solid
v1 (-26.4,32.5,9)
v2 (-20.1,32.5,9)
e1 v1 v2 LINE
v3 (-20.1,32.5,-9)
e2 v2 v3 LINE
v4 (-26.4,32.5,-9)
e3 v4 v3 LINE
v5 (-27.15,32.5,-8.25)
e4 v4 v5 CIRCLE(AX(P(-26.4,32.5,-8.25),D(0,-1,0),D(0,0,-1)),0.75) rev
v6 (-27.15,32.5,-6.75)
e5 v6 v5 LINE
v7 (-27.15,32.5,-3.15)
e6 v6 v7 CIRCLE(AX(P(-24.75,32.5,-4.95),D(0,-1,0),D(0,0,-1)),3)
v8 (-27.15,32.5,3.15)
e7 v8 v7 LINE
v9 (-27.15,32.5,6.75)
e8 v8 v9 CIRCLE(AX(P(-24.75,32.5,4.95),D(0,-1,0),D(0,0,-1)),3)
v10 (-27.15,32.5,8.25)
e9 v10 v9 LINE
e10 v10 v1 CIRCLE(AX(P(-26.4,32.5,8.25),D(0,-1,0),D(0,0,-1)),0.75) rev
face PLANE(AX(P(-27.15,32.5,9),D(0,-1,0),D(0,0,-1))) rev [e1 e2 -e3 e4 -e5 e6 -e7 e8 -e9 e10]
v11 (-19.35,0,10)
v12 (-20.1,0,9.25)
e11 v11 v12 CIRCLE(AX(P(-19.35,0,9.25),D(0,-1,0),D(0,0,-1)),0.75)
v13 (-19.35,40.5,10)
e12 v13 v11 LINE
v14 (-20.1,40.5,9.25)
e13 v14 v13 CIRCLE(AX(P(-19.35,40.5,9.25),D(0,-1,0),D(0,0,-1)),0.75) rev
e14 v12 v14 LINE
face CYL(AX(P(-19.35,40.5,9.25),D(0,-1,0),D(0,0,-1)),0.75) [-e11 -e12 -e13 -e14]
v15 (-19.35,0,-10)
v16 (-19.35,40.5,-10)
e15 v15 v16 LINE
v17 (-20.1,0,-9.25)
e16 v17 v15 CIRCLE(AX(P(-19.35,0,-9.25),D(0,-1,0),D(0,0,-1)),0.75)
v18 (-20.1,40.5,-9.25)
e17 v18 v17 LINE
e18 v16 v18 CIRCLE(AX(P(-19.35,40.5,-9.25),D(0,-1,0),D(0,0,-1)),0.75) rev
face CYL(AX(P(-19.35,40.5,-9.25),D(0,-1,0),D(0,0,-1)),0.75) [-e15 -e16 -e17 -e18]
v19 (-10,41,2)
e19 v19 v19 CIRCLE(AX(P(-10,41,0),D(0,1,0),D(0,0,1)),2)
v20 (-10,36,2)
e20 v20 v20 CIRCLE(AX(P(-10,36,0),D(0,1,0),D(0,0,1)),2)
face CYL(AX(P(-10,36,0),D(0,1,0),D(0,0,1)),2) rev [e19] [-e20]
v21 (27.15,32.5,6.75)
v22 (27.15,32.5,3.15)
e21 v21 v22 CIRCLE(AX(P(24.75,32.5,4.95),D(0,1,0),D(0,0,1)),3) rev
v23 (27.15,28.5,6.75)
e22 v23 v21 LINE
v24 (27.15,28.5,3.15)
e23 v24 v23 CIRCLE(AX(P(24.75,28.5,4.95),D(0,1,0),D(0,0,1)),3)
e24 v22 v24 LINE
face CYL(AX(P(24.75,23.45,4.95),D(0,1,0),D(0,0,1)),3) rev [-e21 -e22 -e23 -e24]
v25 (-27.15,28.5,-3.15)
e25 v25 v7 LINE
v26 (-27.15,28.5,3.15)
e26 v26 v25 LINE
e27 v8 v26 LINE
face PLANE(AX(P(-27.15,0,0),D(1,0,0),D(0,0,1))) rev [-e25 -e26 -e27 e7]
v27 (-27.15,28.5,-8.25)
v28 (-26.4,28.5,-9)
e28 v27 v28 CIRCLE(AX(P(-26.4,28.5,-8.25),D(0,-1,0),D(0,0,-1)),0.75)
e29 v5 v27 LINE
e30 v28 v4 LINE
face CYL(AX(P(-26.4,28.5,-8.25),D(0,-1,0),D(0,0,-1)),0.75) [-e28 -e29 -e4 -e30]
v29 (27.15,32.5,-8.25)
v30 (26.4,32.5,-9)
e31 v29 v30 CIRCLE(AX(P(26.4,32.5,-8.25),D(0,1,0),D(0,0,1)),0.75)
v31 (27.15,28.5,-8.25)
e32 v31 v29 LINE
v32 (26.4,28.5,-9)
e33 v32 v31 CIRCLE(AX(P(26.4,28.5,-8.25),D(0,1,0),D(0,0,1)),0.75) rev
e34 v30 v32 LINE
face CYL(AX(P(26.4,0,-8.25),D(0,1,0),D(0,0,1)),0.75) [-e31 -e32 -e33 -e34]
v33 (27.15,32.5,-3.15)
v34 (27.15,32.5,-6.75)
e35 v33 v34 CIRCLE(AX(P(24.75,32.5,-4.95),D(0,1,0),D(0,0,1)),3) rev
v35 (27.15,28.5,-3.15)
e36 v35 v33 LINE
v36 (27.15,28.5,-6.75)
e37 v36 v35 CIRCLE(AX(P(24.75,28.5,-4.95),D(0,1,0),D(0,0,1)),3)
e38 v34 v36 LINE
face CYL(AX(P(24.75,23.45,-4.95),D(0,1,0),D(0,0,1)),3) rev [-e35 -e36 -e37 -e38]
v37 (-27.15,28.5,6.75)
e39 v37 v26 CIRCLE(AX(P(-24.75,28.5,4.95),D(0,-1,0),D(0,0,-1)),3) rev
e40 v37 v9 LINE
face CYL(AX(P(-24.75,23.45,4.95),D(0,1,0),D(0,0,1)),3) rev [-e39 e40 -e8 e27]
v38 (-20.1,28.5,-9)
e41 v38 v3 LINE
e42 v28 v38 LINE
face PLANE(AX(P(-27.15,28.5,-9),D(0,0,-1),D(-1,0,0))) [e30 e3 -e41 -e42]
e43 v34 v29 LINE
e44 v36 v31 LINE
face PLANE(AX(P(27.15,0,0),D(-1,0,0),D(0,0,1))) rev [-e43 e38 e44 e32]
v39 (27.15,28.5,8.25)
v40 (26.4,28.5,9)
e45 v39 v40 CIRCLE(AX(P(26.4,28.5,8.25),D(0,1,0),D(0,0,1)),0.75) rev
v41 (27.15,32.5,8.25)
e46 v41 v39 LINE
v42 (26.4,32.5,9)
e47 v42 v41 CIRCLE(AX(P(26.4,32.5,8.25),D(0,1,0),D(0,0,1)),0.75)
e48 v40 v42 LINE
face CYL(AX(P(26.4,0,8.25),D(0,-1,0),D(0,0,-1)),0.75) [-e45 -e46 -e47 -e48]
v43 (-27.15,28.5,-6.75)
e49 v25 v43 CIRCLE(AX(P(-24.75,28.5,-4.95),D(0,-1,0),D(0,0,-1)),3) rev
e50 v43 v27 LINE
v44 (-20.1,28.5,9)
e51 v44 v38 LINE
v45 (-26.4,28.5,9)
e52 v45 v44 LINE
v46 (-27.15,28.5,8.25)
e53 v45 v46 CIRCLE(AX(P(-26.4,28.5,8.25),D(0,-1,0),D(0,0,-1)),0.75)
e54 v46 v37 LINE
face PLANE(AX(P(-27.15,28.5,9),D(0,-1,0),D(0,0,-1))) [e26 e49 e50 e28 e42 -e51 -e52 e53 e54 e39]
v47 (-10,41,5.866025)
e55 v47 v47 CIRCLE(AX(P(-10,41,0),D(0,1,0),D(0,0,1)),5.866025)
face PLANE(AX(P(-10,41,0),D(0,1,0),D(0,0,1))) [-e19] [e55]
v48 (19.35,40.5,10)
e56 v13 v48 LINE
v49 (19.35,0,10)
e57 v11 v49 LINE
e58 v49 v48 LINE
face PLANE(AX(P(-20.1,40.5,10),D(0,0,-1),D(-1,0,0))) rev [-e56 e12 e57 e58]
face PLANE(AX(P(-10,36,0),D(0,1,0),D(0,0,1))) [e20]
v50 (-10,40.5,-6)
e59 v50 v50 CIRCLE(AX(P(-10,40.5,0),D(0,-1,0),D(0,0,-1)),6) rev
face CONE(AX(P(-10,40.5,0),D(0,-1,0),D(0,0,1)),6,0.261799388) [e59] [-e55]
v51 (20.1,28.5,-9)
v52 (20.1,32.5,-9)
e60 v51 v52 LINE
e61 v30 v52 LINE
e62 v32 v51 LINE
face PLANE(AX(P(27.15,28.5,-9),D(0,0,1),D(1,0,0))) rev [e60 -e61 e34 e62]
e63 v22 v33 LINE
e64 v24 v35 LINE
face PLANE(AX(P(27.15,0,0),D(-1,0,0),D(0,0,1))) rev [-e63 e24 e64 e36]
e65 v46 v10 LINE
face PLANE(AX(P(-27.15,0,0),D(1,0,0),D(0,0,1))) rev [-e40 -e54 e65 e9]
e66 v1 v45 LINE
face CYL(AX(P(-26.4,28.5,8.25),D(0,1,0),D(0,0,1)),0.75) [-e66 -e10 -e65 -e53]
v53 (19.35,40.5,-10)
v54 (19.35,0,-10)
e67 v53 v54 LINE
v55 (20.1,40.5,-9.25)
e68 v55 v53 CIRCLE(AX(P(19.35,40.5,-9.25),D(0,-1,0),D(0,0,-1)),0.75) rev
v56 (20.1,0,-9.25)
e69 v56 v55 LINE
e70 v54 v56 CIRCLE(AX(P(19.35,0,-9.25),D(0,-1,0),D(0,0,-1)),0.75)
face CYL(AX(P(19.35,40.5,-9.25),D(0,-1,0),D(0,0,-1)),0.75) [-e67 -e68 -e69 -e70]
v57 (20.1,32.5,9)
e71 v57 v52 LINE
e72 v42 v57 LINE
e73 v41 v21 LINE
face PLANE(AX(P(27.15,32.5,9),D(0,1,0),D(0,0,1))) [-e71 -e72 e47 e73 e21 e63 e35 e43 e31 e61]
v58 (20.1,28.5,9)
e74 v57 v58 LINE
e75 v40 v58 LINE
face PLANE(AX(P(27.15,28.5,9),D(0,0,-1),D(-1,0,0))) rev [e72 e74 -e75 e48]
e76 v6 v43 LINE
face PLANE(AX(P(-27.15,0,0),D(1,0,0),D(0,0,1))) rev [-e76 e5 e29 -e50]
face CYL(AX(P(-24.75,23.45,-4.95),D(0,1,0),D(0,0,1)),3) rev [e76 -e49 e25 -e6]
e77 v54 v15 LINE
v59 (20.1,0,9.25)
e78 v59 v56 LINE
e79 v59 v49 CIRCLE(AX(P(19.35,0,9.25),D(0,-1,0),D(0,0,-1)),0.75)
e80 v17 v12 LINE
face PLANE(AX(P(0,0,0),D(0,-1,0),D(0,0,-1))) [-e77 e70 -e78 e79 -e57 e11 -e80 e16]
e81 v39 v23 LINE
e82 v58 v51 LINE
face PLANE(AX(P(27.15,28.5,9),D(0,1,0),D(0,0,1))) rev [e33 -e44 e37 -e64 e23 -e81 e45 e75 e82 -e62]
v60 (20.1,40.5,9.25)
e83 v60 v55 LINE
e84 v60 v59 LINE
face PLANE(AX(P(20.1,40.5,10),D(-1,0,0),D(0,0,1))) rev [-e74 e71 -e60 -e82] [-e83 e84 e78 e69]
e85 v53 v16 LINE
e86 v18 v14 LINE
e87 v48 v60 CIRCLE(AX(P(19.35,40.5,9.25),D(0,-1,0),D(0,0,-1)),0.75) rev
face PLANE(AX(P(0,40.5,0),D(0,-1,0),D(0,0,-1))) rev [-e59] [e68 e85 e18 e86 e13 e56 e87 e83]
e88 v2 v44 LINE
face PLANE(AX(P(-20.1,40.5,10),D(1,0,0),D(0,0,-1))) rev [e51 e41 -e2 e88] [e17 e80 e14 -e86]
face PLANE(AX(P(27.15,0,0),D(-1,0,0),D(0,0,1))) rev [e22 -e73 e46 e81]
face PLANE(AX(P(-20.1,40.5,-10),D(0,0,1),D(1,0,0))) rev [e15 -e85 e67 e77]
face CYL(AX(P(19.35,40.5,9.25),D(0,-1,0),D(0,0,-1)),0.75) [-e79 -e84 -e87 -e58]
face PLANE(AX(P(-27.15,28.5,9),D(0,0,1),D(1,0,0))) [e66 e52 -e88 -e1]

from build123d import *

# Parameters (mm, degrees)
SKETCH1_W           = 40.2
SKETCH1_H           = 20
BOSS_EXTRUDE1_DEPTH = 40.5
SKETCH2_W           = 18
SKETCH2_H           = 2
BOSS_EXTRUDE2_DEPTH = 7.05
SKETCH5_R           = 3
CUT_EXTRUDE1_DEPTH  = 7.05
MIRROR2_START       = 28.5
MIRROR2_DEPTH       = 4
FILLET2_R           = 0.75
SKETCH6_R           = 6
BOSS_EXTRUDE3_DEPTH = 0.5
BOSS_EXTRUDE3_TAPER = 15
SKETCH7_R           = 2
CUT_EXTRUDE3_DEPTH  = 5


# Read off the part's stored shape, not the designer's step: Mirror2
with BuildPart() as part:
    # Sketch1 → Boss-Extrude1 (new body)
    with BuildSketch(Plane(origin=(0, 0, 0), x_dir=(1, 0, 0), z_dir=(0, 1, 0))):
        Rectangle(SKETCH1_W, SKETCH1_H)
    extrude(amount=BOSS_EXTRUDE1_DEPTH)

    # Sketch2 → Boss-Extrude2 (add)
    with BuildSketch(Plane(origin=(20.1, 0, 0), x_dir=(0, 0, -1), z_dir=(1, 0, 0))):
        with Locations((0, 29.5)):
            Rectangle(SKETCH2_W, SKETCH2_H)
    extrude(amount=BOSS_EXTRUDE2_DEPTH)

    # Sketch5 → Cut-Extrude1 (cut)
    with BuildSketch(Plane(origin=(0, 30.5, 0), x_dir=(1, 0, 0), z_dir=(0, 1, 0))):
        with Locations((24.75, 4.95)):
            Circle(SKETCH5_R)
        with Locations((24.75, -4.95)):
            Circle(SKETCH5_R)
    extrude(amount=-CUT_EXTRUDE1_DEPTH, mode=Mode.SUBTRACT)

    # Mirror2 outline → Mirror2 (add)
    with BuildSketch(Plane(origin=(0, 0, 0), x_dir=(1, 0, 0), z_dir=(0, 1, 0)).offset(MIRROR2_START)):
        with BuildLine():
            Line((-27.15, 3.15), (-27.15, -3.15))
            ThreePointArc((-27.15, -3.15), (-21.75, -4.95), (-27.15, -6.75))
            Line((-27.15, -6.75), (-27.15, -9))
            Line((-27.15, -9), (-20.1, -9))
            Line((-20.1, -9), (-20.1, 9))
            Line((-20.1, 9), (-27.15, 9))
            Line((-27.15, 9), (-27.15, 6.75))
            ThreePointArc((-27.15, 6.75), (-21.75, 4.95), (-27.15, 3.15))
        make_face()
        with BuildLine():
            Line((27.15, 6.75), (27.15, 9))
            Line((27.15, 9), (20.1, 9))
            Line((20.1, 9), (20.1, -9))
            Line((20.1, -9), (27.15, -9))
            Line((27.15, -9), (27.15, -6.75))
            ThreePointArc((27.15, -6.75), (21.75, -4.95), (27.15, -3.15))
            Line((27.15, -3.15), (27.15, 3.15))
            ThreePointArc((27.15, 3.15), (21.75, 4.95), (27.15, 6.75))
        make_face()
    extrude(amount=MIRROR2_DEPTH)

    # Fillet2
    fillet2_edges = [part.edges().sort_by_distance(p)[0] for p in [
        (27.15, 30.5, 9),
        (27.15, 30.5, -9),
        (-27.15, 30.5, 9),
        (-27.15, 30.5, -9),
        (20.1, 20.25, 10),
        (-20.1, 20.25, 10),
        (-20.1, 20.25, -10),
        (20.1, 20.25, -10),
    ]]
    fillet(fillet2_edges, radius=FILLET2_R)

    # Sketch6 → Boss-Extrude3 (add)
    with BuildSketch(Plane(origin=(0, 40.5, 0), x_dir=(1, 0, 0), z_dir=(0, 1, 0))):
        with Locations((-10, 0)):
            Circle(SKETCH6_R)
    extrude(amount=BOSS_EXTRUDE3_DEPTH, taper=BOSS_EXTRUDE3_TAPER)

    # Sketch7 → Cut-Extrude3 (cut)
    with BuildSketch(Plane(origin=(0, 41, 0), x_dir=(1, 0, 0), z_dir=(0, 1, 0))):
        with Locations(Location((-10, 0, 0), (0, 0, 270))):
            Circle(SKETCH7_R)
    extrude(amount=-CUT_EXTRUDE3_DEPTH, mode=Mode.SUBTRACT)


solid = part.part
